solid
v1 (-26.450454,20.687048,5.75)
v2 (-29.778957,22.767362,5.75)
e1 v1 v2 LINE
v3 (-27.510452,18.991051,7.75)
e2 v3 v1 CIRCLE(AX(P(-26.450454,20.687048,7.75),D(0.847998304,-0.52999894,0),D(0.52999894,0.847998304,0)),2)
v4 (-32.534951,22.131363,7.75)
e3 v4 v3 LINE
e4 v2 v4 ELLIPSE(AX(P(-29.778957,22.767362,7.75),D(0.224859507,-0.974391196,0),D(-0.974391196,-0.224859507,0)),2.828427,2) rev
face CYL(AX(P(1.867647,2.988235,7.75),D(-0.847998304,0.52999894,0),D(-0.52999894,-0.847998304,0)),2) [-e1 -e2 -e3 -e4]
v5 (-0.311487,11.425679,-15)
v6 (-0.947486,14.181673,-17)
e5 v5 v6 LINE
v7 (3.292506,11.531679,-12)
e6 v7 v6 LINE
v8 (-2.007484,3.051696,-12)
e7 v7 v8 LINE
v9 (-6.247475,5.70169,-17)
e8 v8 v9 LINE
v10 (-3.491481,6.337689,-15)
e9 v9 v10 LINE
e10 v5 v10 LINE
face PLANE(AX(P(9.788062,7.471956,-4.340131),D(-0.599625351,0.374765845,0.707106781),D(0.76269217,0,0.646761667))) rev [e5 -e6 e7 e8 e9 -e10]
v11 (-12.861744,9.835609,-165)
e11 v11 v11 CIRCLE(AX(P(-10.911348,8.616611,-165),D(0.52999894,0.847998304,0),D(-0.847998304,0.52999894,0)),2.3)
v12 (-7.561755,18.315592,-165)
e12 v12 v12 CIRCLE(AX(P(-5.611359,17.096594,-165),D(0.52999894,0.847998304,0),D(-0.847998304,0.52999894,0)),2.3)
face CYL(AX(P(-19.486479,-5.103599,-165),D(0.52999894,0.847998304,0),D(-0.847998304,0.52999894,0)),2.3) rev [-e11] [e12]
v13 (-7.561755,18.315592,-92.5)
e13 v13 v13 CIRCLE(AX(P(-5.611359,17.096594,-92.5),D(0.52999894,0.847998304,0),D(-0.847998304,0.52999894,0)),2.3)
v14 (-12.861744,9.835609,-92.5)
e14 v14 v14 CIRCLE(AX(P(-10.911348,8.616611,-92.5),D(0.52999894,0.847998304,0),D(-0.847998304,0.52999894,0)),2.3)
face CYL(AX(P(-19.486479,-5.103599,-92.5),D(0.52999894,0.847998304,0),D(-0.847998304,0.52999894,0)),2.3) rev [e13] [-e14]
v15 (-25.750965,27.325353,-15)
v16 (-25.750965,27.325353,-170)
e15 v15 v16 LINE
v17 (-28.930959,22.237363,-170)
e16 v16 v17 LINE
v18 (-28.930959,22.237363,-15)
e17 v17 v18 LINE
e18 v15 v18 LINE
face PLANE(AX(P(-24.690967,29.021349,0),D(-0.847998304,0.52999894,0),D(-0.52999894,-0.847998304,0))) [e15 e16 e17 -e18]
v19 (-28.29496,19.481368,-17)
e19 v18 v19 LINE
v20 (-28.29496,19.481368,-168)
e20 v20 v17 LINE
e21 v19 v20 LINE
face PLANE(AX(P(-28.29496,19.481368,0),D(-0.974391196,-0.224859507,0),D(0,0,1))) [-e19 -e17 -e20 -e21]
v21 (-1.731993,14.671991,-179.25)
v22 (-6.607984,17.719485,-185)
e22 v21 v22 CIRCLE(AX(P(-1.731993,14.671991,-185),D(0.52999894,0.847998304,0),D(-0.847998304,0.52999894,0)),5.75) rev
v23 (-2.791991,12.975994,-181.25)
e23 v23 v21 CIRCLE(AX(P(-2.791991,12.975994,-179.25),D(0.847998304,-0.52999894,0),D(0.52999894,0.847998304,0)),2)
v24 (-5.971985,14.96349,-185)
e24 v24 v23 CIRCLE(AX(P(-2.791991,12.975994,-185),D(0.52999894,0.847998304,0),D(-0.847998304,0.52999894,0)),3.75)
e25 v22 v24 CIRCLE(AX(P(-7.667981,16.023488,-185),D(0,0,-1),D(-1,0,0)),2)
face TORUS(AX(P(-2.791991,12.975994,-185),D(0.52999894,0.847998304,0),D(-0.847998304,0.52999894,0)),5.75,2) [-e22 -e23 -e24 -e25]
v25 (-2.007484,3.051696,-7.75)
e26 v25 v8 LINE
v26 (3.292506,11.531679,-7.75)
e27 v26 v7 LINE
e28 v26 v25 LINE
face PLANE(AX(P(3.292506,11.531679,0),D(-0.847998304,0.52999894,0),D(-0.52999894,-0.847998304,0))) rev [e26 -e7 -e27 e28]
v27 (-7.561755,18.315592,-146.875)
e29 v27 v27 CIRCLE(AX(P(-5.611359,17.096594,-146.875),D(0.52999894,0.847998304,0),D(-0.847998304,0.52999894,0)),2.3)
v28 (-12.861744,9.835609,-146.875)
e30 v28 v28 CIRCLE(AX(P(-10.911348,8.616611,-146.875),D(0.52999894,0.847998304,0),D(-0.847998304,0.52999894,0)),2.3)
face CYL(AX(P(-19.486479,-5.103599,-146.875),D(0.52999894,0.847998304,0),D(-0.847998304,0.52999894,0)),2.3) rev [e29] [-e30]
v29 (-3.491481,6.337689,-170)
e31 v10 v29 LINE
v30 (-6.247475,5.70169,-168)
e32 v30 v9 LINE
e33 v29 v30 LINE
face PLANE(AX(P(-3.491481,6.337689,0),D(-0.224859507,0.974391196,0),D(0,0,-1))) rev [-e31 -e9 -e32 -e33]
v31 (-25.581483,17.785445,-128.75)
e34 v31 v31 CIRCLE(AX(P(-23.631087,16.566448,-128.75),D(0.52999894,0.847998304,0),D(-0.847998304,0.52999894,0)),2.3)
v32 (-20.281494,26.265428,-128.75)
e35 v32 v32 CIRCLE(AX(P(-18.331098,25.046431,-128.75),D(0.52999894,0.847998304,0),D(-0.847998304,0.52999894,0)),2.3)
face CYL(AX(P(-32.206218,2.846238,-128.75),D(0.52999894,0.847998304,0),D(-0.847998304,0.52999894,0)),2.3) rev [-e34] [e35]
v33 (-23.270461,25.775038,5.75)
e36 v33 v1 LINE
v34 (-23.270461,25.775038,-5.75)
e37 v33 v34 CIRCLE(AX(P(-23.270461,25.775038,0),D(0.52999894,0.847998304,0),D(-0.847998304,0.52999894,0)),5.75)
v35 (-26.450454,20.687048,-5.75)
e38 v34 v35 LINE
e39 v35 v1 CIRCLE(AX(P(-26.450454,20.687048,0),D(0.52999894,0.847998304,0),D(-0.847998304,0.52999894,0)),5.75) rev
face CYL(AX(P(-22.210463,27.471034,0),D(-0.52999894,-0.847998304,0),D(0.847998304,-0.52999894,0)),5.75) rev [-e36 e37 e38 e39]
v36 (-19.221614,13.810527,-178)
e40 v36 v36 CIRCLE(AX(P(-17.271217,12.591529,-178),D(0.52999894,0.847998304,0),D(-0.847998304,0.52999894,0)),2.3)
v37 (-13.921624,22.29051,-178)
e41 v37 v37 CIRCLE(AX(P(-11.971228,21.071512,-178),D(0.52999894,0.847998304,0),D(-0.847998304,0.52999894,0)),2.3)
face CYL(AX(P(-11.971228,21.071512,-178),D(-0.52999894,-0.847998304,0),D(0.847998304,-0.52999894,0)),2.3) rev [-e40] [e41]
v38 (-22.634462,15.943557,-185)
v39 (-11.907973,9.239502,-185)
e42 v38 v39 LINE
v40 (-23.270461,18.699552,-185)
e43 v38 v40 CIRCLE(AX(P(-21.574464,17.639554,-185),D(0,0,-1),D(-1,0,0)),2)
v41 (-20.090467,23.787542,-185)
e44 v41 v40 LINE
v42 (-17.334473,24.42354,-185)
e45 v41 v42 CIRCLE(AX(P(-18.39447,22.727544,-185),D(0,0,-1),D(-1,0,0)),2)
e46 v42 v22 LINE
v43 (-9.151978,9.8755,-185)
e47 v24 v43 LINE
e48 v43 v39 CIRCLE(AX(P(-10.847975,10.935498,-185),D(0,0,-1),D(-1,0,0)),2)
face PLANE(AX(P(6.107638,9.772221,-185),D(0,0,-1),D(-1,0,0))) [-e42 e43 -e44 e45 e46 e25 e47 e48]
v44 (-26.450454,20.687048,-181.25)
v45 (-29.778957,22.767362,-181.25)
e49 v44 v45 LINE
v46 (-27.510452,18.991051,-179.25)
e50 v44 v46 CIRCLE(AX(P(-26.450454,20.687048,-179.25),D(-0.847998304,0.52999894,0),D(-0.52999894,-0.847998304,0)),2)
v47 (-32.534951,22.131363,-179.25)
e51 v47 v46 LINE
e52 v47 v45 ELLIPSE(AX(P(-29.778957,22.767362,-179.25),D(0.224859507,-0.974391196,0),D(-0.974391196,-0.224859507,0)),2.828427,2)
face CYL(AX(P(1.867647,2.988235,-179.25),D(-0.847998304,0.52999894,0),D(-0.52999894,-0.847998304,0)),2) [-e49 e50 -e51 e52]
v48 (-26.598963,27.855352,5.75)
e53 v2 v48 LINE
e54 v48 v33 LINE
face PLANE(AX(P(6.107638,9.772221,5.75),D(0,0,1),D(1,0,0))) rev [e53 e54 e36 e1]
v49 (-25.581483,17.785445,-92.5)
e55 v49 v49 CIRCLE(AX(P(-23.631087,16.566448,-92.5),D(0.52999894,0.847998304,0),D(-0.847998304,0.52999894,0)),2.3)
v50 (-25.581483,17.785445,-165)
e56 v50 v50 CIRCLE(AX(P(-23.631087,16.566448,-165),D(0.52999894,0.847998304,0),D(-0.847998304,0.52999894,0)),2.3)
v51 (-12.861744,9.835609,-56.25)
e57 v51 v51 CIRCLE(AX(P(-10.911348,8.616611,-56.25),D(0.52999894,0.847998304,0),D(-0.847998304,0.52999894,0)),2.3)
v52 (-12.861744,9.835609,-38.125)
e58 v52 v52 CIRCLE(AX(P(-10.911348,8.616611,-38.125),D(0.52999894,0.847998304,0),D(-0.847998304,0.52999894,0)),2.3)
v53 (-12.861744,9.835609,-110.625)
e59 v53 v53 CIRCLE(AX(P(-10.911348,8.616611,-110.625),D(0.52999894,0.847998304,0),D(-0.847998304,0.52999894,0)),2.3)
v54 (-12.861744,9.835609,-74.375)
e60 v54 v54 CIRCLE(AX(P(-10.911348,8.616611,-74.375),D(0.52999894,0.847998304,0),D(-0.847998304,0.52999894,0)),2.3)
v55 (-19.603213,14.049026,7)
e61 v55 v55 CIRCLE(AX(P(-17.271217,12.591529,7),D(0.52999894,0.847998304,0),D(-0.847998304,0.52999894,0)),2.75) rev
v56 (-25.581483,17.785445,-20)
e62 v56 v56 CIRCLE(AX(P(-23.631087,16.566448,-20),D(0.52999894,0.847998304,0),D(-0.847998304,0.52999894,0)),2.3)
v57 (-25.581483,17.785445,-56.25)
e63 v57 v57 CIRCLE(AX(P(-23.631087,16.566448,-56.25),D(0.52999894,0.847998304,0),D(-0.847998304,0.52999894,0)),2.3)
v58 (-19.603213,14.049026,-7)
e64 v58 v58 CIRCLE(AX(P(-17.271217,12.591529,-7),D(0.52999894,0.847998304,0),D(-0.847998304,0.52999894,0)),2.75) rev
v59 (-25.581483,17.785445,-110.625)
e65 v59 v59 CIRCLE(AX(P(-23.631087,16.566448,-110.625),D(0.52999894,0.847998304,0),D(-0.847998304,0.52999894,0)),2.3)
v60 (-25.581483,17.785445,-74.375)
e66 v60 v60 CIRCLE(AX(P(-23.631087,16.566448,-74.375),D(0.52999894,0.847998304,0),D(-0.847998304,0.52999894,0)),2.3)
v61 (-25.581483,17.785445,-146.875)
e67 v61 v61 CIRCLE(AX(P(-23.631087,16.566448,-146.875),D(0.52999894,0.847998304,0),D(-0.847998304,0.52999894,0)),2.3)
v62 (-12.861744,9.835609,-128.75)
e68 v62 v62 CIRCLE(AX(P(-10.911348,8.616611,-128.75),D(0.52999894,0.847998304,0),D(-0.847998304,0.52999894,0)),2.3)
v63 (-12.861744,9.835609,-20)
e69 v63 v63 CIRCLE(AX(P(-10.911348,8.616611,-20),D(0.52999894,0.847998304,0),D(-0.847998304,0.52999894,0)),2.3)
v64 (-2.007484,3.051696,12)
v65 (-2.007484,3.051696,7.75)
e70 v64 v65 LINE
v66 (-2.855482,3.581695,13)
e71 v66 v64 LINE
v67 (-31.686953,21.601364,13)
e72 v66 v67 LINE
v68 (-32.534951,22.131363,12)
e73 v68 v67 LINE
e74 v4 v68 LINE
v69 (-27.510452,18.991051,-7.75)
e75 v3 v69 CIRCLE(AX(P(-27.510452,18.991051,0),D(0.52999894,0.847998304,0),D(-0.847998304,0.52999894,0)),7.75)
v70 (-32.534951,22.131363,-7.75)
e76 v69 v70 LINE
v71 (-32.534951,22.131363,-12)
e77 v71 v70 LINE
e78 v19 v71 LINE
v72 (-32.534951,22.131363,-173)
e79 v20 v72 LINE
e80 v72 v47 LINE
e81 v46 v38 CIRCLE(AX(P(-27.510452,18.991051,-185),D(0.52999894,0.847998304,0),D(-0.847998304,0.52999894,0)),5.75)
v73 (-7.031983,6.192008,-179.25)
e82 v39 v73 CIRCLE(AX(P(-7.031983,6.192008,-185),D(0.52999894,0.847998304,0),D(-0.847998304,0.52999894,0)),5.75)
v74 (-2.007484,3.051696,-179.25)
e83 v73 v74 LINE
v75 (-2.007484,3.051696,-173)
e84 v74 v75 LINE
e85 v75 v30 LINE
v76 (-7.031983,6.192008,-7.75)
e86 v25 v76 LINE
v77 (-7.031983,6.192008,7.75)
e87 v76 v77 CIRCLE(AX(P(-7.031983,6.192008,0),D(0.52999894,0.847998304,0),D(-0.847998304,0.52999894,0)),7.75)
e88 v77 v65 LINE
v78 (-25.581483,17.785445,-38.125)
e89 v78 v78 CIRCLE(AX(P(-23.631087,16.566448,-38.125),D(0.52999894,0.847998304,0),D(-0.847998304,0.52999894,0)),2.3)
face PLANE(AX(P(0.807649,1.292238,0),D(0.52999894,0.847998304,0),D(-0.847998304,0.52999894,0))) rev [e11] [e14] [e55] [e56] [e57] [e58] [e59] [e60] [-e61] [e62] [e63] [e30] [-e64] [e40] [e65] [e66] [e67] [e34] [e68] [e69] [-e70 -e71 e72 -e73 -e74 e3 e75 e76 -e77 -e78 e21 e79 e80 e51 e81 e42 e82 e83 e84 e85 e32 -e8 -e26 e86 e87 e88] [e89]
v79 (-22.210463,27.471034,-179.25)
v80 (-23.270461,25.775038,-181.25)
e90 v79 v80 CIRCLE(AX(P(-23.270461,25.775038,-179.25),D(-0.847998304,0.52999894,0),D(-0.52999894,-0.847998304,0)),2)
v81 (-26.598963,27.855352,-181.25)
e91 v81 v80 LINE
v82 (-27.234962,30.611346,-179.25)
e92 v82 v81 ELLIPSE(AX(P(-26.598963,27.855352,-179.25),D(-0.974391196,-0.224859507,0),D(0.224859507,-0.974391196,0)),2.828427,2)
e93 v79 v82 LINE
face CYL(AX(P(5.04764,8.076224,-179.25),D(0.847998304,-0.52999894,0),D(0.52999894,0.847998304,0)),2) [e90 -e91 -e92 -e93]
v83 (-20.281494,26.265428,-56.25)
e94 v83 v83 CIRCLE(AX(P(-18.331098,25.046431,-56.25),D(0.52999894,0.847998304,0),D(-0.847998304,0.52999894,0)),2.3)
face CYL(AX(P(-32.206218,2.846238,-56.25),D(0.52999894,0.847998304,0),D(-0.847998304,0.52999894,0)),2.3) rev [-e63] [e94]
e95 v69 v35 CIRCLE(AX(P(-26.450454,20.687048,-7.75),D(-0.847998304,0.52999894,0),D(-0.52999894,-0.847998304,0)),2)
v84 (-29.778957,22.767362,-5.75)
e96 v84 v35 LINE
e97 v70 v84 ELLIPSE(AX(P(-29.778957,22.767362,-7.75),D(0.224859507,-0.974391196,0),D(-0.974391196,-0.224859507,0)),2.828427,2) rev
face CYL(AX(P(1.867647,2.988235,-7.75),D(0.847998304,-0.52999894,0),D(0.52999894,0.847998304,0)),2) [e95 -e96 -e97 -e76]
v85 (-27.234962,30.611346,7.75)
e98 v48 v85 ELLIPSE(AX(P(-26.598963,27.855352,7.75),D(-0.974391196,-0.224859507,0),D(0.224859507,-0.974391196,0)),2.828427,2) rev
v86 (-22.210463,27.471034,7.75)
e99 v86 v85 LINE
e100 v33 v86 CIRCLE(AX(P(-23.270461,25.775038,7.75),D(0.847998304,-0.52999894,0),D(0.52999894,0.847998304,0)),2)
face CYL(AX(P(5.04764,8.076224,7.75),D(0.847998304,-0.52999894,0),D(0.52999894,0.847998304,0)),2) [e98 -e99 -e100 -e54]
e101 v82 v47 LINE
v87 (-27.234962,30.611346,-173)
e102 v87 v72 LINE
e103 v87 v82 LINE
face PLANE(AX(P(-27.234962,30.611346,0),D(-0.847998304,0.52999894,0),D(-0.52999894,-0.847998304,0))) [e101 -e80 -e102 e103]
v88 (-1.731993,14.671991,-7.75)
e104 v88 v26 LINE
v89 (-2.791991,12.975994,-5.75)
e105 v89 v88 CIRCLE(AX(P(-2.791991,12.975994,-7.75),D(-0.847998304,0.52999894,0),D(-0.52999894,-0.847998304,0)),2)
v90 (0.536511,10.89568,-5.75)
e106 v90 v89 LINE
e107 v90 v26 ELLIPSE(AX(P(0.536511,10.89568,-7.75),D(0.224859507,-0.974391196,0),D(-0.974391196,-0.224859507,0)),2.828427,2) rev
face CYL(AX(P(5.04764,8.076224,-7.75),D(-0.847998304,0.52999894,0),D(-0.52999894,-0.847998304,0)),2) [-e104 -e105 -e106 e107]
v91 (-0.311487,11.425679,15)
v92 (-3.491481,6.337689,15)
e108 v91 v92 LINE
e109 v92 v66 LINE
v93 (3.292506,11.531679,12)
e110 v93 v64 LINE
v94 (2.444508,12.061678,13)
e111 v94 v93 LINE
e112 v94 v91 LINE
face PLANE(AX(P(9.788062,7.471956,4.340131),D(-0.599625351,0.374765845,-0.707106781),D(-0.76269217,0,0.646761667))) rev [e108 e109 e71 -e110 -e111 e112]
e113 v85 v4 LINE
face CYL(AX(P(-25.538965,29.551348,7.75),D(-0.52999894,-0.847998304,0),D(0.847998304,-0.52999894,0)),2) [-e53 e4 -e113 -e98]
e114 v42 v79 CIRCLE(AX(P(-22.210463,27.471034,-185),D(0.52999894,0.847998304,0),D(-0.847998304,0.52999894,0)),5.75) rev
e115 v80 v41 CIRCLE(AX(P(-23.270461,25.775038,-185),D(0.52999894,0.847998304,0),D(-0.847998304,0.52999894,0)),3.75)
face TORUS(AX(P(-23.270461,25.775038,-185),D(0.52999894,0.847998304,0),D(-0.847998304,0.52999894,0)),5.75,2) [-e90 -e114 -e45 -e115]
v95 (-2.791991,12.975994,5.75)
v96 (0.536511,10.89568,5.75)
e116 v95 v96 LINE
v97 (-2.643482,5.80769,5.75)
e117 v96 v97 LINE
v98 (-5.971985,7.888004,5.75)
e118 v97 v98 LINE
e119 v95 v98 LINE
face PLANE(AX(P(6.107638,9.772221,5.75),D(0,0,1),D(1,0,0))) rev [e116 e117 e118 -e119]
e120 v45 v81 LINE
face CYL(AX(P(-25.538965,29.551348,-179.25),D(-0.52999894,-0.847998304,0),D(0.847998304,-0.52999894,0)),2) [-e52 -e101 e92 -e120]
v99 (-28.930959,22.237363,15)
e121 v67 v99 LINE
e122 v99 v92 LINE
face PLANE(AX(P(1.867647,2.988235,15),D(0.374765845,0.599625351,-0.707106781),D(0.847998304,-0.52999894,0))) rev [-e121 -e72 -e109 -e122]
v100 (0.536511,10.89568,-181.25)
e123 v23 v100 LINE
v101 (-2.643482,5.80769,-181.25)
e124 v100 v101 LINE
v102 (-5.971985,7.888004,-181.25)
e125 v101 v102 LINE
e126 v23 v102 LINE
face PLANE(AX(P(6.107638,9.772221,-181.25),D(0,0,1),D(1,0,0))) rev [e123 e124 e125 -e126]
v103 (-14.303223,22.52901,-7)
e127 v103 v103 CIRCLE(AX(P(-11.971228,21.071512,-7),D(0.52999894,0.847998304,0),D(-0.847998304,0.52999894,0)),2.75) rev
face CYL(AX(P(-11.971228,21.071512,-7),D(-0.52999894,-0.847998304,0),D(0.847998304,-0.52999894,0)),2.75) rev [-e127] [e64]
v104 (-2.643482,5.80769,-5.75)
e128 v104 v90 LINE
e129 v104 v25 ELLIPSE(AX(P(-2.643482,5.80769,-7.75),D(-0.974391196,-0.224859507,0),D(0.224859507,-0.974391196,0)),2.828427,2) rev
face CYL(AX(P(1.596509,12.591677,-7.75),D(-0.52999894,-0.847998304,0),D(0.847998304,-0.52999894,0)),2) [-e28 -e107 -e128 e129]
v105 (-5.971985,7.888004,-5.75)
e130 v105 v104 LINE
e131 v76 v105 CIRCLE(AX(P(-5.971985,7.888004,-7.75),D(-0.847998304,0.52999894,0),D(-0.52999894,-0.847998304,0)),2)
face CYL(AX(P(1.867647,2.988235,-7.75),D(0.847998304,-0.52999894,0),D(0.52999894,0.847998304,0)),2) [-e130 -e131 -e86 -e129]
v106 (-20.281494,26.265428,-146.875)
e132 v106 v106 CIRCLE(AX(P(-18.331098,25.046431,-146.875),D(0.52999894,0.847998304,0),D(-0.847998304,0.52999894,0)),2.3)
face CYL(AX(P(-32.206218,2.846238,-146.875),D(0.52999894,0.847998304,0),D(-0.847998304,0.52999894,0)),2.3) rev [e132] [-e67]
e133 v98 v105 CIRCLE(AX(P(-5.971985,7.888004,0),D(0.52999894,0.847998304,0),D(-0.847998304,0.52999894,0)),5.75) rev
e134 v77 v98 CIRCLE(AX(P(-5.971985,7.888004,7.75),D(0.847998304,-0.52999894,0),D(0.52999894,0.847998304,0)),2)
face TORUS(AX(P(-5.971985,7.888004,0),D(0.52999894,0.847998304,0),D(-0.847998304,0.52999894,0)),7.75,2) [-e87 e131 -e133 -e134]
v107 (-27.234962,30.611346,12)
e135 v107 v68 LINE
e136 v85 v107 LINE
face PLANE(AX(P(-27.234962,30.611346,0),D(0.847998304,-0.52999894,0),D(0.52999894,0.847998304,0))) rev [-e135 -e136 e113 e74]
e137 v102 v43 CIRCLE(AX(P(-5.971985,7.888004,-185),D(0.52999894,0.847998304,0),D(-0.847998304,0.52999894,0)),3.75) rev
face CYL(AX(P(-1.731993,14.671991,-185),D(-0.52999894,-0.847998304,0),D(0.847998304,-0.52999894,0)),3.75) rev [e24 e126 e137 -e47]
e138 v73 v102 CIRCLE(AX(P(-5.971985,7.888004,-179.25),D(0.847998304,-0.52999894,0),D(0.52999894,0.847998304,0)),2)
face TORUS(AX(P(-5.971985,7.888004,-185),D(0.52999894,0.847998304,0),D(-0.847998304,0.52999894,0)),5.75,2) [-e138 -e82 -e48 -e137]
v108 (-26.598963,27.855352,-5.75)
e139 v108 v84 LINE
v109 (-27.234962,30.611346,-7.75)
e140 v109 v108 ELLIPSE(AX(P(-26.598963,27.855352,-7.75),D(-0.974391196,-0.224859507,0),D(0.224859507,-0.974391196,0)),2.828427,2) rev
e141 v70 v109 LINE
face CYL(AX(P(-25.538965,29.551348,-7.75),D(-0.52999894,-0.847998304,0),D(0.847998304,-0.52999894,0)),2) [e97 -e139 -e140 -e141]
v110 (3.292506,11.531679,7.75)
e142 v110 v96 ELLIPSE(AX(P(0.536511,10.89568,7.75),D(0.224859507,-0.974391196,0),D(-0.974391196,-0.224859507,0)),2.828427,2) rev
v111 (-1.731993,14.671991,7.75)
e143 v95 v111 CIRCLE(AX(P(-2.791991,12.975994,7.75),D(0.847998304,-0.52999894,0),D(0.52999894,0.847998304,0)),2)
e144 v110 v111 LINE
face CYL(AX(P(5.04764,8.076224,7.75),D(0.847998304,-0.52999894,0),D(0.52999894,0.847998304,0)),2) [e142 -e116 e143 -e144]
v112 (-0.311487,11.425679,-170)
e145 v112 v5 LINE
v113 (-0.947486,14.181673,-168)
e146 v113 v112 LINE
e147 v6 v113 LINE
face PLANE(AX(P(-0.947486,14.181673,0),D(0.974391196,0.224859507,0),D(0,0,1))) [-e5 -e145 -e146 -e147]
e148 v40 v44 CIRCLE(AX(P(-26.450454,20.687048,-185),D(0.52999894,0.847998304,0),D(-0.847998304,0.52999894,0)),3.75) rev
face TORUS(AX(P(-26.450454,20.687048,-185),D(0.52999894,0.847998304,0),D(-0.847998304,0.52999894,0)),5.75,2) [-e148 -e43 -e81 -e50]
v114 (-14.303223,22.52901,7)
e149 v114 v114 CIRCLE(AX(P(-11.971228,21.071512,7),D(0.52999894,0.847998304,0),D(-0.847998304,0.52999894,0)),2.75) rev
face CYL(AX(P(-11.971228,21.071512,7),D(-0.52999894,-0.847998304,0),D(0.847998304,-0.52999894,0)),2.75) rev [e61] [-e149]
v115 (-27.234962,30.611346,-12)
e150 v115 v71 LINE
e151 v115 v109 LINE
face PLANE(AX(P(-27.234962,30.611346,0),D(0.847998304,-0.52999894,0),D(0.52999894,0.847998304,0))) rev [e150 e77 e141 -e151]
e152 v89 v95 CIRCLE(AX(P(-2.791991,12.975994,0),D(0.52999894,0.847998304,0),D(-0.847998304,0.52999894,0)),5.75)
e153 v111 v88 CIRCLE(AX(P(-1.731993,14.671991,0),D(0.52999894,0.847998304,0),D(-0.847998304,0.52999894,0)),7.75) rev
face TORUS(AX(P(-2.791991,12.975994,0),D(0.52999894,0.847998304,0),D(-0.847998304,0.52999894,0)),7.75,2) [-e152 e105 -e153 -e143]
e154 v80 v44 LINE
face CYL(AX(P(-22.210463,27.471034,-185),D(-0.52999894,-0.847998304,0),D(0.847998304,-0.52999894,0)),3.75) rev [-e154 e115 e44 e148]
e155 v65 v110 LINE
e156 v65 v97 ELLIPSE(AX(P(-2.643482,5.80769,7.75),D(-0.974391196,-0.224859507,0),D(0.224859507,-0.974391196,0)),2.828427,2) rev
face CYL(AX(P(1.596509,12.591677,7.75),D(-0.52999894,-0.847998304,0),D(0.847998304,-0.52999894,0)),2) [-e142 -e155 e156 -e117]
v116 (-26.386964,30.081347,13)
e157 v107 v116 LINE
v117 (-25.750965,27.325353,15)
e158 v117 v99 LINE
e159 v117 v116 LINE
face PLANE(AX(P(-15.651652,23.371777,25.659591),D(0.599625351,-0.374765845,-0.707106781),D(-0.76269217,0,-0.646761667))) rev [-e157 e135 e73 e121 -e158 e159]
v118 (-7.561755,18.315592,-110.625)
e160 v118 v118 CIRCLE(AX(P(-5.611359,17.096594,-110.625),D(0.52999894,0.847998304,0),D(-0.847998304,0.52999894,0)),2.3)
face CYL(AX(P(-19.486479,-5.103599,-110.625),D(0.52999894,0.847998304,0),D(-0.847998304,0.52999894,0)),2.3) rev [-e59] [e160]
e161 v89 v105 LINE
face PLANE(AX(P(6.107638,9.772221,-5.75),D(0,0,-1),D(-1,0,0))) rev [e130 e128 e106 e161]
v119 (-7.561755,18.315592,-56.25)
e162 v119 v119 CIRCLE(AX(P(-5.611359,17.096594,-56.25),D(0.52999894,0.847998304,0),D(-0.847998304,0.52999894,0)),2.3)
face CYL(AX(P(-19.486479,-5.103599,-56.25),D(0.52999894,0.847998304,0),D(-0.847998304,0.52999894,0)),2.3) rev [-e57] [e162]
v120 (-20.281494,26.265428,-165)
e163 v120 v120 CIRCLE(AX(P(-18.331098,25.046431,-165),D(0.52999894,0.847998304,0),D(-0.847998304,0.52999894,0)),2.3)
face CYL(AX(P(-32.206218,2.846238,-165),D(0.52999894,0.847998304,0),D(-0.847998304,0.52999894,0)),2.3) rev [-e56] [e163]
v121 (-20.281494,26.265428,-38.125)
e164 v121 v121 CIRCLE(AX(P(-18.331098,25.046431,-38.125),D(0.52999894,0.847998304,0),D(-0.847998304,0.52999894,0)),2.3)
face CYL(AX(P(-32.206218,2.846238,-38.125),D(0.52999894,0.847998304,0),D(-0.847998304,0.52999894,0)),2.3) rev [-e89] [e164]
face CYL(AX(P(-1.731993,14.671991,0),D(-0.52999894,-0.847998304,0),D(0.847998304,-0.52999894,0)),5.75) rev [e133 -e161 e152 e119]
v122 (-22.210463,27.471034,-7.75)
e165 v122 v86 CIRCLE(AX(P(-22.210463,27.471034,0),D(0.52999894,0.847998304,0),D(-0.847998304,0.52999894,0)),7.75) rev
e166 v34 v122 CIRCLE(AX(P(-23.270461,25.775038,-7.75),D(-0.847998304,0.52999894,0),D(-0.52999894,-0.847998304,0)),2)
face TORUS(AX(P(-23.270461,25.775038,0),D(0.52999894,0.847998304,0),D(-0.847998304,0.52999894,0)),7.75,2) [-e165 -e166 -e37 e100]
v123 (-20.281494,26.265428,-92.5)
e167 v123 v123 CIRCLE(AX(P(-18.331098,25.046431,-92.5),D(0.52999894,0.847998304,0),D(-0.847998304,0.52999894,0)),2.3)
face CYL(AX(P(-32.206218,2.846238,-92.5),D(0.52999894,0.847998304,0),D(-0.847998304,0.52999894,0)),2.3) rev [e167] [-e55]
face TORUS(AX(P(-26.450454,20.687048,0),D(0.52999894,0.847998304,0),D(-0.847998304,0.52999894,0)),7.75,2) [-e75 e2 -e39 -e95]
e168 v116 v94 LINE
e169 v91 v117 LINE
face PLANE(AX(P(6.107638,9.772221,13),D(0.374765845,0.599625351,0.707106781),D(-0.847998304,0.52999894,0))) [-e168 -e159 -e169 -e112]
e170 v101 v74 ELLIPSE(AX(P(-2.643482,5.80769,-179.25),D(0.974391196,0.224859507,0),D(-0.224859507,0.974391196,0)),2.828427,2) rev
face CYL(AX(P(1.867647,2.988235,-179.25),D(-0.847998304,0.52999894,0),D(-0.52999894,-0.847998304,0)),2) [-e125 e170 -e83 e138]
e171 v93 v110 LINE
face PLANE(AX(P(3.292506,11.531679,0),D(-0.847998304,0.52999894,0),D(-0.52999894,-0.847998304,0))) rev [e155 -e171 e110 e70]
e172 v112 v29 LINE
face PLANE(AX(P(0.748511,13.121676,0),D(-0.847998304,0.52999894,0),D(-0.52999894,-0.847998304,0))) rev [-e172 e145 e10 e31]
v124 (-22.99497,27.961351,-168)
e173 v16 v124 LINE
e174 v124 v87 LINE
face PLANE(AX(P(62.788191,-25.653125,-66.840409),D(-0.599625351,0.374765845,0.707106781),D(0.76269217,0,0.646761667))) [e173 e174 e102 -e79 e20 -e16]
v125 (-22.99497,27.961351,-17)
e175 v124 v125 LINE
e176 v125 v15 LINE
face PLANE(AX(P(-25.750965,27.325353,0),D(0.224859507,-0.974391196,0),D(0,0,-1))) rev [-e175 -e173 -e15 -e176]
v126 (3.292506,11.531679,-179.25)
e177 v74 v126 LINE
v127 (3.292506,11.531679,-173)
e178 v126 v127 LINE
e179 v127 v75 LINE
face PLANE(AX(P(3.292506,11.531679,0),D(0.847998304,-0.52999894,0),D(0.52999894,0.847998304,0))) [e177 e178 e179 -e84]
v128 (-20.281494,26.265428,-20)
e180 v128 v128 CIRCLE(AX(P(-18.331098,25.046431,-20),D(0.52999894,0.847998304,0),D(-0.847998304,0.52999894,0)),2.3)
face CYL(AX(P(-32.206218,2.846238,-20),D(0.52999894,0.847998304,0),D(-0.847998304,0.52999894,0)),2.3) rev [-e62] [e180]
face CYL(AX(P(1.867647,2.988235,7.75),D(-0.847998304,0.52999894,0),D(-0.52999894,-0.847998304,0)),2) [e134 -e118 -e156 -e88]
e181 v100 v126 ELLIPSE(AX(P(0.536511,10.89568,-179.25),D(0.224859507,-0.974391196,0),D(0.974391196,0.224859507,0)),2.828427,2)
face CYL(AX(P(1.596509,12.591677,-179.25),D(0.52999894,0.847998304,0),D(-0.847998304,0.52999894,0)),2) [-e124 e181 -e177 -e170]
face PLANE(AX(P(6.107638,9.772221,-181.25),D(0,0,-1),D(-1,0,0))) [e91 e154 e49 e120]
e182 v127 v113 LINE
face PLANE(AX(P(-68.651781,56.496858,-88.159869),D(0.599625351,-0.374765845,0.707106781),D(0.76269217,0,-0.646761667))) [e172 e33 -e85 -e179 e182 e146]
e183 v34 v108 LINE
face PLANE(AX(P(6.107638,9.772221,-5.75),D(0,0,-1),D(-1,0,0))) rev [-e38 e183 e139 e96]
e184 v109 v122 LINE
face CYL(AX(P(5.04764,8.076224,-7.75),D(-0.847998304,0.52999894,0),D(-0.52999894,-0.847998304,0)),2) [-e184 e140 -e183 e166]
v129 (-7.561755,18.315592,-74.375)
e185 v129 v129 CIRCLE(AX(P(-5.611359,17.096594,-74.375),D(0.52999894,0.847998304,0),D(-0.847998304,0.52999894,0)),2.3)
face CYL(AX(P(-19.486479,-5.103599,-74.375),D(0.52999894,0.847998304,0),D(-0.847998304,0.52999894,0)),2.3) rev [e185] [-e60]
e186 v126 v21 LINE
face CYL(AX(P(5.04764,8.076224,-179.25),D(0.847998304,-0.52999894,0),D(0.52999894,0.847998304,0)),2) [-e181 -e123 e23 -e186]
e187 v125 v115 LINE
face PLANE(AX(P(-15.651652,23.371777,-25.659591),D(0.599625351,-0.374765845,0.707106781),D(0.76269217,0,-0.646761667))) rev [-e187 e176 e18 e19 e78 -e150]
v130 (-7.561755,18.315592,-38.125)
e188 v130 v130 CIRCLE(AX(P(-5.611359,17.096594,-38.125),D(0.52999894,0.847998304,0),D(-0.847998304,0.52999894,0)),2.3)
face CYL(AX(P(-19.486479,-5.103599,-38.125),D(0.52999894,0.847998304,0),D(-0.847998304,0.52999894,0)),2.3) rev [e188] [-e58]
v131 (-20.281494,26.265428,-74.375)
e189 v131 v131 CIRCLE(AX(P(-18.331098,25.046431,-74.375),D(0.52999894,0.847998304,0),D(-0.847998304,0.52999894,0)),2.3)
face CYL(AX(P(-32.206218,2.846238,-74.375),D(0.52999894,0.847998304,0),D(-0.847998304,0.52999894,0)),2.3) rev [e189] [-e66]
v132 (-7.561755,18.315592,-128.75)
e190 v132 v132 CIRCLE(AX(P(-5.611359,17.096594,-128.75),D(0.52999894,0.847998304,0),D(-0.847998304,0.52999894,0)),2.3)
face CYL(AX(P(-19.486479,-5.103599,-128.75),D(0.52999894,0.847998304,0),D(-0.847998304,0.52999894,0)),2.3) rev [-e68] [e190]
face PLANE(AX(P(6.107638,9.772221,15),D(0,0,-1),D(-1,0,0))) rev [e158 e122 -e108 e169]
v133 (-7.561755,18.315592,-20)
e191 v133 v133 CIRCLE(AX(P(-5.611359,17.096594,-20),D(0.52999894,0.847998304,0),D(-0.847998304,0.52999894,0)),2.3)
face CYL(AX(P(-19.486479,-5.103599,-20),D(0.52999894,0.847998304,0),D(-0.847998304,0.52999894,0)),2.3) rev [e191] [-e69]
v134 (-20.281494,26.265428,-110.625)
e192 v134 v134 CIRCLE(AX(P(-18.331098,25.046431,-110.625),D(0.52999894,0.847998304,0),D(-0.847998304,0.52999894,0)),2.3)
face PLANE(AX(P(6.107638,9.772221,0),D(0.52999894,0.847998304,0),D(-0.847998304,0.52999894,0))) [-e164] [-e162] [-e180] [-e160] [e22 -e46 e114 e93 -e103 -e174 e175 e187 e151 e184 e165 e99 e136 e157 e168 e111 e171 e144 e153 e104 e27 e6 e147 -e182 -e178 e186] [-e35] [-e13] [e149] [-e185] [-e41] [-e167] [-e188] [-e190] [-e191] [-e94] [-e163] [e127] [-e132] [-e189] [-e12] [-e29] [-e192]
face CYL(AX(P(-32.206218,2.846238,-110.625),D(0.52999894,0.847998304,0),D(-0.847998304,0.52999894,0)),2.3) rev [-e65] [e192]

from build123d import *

# Parameters (mm, degrees)
BOSS_EXTRU_1_OUTLINE_R   = 2.75
BOSS_EXTRU_1_OUTLINE_R_2 = 2.3
BOSS_EXTRU_1_DEPTH       = 10
ESQUISSE2_R              = 2.3
ENL_V_MAT_EXTRU_1_DEPTH  = 191.138157298
CONG_1_R                 = 2
CHANFREIN1_SIZE          = 2
CONG_2_R                 = 2


# Read off the part's stored shape, not the designer's step: Boss.-Extru.1
with BuildPart() as part:
    # Boss.-Extru.1 outline → Boss.-Extru.1 (new body)
    with BuildSketch(Plane(origin=(0.807648755, 1.292238009, 0), x_dir=(0.8479983040028684, -0.5299989400067315, 0), z_dir=(0.5299989400067315, 0.8479983040028684, 0))):
        with BuildLine():
            Line((-3.319738136, 181.25), (-9.244866887, 181.25))
            ThreePointArc((-9.244866887, 181.25), (-11.896517316, 182.348349571), (-12.994866887, 185))
            Line((-12.994866887, 185), (-29.644053825, 185))
            ThreePointArc((-29.644053825, 185), (-30.742403396, 182.348349571), (-33.394053825, 181.25))
            Line((-33.394053825, 181.25), (-39.319182576, 181.25))
            Line((-39.319182576, 181.25), (-39.319182576, 173))
            Line((-39.319182576, 173), (-36.319182576, 170))
            Line((-36.319182576, 170), (-36.319182576, 15))
            Line((-36.319182576, 15), (-39.319182576, 12))
            Line((-39.319182576, 12), (-39.319182576, 5.75))
            Line((-39.319182576, 5.75), (-33.394053825, 5.75))
            ThreePointArc((-33.394053825, 5.75), (-27.644053825, 0), (-33.394053825, -5.75))
            Line((-33.394053825, -5.75), (-39.319182576, -5.75))
            Line((-39.319182576, -5.75), (-39.319182576, -12))
            Line((-39.319182576, -12), (-36.319182576, -15))
            Line((-36.319182576, -15), (-6.319738136, -15))
            Line((-6.319738136, -15), (-3.319738136, -12))
            Line((-3.319738136, -12), (-3.319738136, -5.75))
            Line((-3.319738136, -5.75), (-9.244866887, -5.75))
            ThreePointArc((-9.244866887, -5.75), (-14.994866887, 0), (-9.244866887, 5.75))
            Line((-9.244866887, 5.75), (-3.319738136, 5.75))
            Line((-3.319738136, 5.75), (-3.319738136, 12))
            Line((-3.319738136, 12), (-6.319738136, 15))
            Line((-6.319738136, 15), (-6.319738136, 170))
            Line((-6.319738136, 170), (-3.319738136, 173))
            Line((-3.319738136, 173), (-3.319738136, 181.25))
        make_face()
        with Locations((-21.319460356, -7)):
            Circle(BOSS_EXTRU_1_OUTLINE_R, mode=Mode.SUBTRACT)
        with Locations((-21.319460356, 7)):
            Circle(BOSS_EXTRU_1_OUTLINE_R, mode=Mode.SUBTRACT)
        with Locations((-21.319460356, 178)):
            Circle(BOSS_EXTRU_1_OUTLINE_R_2, mode=Mode.SUBTRACT)
    extrude(amount=BOSS_EXTRU_1_DEPTH)

    # Esquisse2 → Enlèv. mat.-Extru.1 (cut, through all)
    with BuildSketch(Plane(origin=(6.107638155, 9.772221049, 0), x_dir=(0.8479983040028684, -0.5299989400067316, 0), z_dir=(0.5299989400067316, 0.8479983040028684, 0))):
        with Locations(Location((-28.819321466, 146.875, 0), (0, 0, 180))):
            Circle(ESQUISSE2_R)
        with Locations(Location((-13.819599246, 146.875, 0), (0, 0, 180))):
            Circle(ESQUISSE2_R)
        with Locations(Location((-28.819321466, 128.75, 0), (0, 0, 180))):
            Circle(ESQUISSE2_R)
        with Locations(Location((-13.819599246, 128.75, 0), (0, 0, 180))):
            Circle(ESQUISSE2_R)
        with Locations(Location((-28.819321466, 110.625, 0), (0, 0, 180))):
            Circle(ESQUISSE2_R)
        with Locations(Location((-13.819599246, 110.625, 0), (0, 0, 180))):
            Circle(ESQUISSE2_R)
        with Locations(Location((-28.819321466, 92.5, 0), (0, 0, 180))):
            Circle(ESQUISSE2_R)
        with Locations(Location((-13.819599246, 92.5, 0), (0, 0, 180))):
            Circle(ESQUISSE2_R)
        with Locations(Location((-28.819321466, 74.375, 0), (0, 0, 180))):
            Circle(ESQUISSE2_R)
        with Locations(Location((-13.819599246, 74.375, 0), (0, 0, 180))):
            Circle(ESQUISSE2_R)
        with Locations(Location((-13.819599246, 56.25, 0), (0, 0, 180))):
            Circle(ESQUISSE2_R)
        with Locations(Location((-13.819599246, 38.125, 0), (0, 0, 180))):
            Circle(ESQUISSE2_R)
        with Locations(Location((-13.819599246, 20, 0), (0, 0, 180))):
            Circle(ESQUISSE2_R)
        with Locations(Location((-28.819321466, 38.125, 0), (0, 0, 180))):
            Circle(ESQUISSE2_R)
        with Locations(Location((-28.819321466, 20, 0), (0, 0, 180))):
            Circle(ESQUISSE2_R)
        with Locations(Location((-28.819321466, 56.25, 0), (0, 0, 180))):
            Circle(ESQUISSE2_R)
        with Locations(Location((-28.819321466, 165, 0), (0, 0, 180))):
            Circle(ESQUISSE2_R)
        with Locations(Location((-13.819599246, 165, 0), (0, 0, 180))):
            Circle(ESQUISSE2_R)
    extrude(amount=-ENL_V_MAT_EXTRU_1_DEPTH, mode=Mode.SUBTRACT)

    # Congé1
    cong_1_edges = [part.edges().sort_by_distance(p)[0] for p in [
        (-3.980588352, 16.077362616, -182.348349571),
        (0.78025628, 13.10183472, -181.25),
        (-19.961867785, 26.065662262, -182.348349571),
        (-24.722712418, 29.041190157, -181.25),
        (-4.51973312, 4.62185168, -181.25),
        (-30.022701818, 20.561207117, -181.25),
        (-25.261857185, 17.585679222, -182.348349571),
        (-9.280577752, 7.597379576, -182.348349571),
        (0.642511146, 7.291687222, -181.25),
        (-29.884956684, 26.371354616, -181.25),
    ]]
    fillet(cong_1_edges, radius=CONG_1_R)

    # Chanfrein1
    chanfrein1_edges = [part.edges().sort_by_distance(p)[0] for p in [
        (0.748510934, 13.121675562, -92.5),
        (-4.551478466, 4.641692522, -92.5),
        (-17.271217469, 12.591529399, 15),
        (-29.990956472, 20.541366276, -92.5),
        (-24.690967072, 29.021349316, -92.5),
        (-11.971228069, 21.071512439, 15),
    ]]
    chamfer(chanfrein1_edges, length=CHANFREIN1_SIZE)

    # Congé2
    cong_2_edges = [part.edges().sort_by_distance(p)[0] for p in [
        (0.78025628, 13.10183472, 5.75),
        (-6.607983534, 17.719484604, 0),
        (0.78025628, 13.10183472, -5.75),
        (-4.51973312, 4.62185168, -5.75),
        (-11.907972934, 9.239501564, 0),
        (-4.51973312, 4.62185168, 5.75),
        (-30.022701818, 20.561207117, 5.75),
        (-22.634462004, 15.943557233, 0),
        (-30.022701818, 20.561207117, -5.75),
        (0.642511146, 7.291687222, -5.75),
        (0.642511146, 7.291687222, 5.75),
        (-29.884956684, 26.371354616, 5.75),
        (-29.884956684, 26.371354616, -5.75),
        (-24.722712418, 29.041190157, -5.75),
        (-17.334472604, 24.423540273, 0),
        (-24.722712418, 29.041190157, 5.75),
    ]]
    fillet(cong_2_edges, radius=CONG_2_R)


solid = part.part
